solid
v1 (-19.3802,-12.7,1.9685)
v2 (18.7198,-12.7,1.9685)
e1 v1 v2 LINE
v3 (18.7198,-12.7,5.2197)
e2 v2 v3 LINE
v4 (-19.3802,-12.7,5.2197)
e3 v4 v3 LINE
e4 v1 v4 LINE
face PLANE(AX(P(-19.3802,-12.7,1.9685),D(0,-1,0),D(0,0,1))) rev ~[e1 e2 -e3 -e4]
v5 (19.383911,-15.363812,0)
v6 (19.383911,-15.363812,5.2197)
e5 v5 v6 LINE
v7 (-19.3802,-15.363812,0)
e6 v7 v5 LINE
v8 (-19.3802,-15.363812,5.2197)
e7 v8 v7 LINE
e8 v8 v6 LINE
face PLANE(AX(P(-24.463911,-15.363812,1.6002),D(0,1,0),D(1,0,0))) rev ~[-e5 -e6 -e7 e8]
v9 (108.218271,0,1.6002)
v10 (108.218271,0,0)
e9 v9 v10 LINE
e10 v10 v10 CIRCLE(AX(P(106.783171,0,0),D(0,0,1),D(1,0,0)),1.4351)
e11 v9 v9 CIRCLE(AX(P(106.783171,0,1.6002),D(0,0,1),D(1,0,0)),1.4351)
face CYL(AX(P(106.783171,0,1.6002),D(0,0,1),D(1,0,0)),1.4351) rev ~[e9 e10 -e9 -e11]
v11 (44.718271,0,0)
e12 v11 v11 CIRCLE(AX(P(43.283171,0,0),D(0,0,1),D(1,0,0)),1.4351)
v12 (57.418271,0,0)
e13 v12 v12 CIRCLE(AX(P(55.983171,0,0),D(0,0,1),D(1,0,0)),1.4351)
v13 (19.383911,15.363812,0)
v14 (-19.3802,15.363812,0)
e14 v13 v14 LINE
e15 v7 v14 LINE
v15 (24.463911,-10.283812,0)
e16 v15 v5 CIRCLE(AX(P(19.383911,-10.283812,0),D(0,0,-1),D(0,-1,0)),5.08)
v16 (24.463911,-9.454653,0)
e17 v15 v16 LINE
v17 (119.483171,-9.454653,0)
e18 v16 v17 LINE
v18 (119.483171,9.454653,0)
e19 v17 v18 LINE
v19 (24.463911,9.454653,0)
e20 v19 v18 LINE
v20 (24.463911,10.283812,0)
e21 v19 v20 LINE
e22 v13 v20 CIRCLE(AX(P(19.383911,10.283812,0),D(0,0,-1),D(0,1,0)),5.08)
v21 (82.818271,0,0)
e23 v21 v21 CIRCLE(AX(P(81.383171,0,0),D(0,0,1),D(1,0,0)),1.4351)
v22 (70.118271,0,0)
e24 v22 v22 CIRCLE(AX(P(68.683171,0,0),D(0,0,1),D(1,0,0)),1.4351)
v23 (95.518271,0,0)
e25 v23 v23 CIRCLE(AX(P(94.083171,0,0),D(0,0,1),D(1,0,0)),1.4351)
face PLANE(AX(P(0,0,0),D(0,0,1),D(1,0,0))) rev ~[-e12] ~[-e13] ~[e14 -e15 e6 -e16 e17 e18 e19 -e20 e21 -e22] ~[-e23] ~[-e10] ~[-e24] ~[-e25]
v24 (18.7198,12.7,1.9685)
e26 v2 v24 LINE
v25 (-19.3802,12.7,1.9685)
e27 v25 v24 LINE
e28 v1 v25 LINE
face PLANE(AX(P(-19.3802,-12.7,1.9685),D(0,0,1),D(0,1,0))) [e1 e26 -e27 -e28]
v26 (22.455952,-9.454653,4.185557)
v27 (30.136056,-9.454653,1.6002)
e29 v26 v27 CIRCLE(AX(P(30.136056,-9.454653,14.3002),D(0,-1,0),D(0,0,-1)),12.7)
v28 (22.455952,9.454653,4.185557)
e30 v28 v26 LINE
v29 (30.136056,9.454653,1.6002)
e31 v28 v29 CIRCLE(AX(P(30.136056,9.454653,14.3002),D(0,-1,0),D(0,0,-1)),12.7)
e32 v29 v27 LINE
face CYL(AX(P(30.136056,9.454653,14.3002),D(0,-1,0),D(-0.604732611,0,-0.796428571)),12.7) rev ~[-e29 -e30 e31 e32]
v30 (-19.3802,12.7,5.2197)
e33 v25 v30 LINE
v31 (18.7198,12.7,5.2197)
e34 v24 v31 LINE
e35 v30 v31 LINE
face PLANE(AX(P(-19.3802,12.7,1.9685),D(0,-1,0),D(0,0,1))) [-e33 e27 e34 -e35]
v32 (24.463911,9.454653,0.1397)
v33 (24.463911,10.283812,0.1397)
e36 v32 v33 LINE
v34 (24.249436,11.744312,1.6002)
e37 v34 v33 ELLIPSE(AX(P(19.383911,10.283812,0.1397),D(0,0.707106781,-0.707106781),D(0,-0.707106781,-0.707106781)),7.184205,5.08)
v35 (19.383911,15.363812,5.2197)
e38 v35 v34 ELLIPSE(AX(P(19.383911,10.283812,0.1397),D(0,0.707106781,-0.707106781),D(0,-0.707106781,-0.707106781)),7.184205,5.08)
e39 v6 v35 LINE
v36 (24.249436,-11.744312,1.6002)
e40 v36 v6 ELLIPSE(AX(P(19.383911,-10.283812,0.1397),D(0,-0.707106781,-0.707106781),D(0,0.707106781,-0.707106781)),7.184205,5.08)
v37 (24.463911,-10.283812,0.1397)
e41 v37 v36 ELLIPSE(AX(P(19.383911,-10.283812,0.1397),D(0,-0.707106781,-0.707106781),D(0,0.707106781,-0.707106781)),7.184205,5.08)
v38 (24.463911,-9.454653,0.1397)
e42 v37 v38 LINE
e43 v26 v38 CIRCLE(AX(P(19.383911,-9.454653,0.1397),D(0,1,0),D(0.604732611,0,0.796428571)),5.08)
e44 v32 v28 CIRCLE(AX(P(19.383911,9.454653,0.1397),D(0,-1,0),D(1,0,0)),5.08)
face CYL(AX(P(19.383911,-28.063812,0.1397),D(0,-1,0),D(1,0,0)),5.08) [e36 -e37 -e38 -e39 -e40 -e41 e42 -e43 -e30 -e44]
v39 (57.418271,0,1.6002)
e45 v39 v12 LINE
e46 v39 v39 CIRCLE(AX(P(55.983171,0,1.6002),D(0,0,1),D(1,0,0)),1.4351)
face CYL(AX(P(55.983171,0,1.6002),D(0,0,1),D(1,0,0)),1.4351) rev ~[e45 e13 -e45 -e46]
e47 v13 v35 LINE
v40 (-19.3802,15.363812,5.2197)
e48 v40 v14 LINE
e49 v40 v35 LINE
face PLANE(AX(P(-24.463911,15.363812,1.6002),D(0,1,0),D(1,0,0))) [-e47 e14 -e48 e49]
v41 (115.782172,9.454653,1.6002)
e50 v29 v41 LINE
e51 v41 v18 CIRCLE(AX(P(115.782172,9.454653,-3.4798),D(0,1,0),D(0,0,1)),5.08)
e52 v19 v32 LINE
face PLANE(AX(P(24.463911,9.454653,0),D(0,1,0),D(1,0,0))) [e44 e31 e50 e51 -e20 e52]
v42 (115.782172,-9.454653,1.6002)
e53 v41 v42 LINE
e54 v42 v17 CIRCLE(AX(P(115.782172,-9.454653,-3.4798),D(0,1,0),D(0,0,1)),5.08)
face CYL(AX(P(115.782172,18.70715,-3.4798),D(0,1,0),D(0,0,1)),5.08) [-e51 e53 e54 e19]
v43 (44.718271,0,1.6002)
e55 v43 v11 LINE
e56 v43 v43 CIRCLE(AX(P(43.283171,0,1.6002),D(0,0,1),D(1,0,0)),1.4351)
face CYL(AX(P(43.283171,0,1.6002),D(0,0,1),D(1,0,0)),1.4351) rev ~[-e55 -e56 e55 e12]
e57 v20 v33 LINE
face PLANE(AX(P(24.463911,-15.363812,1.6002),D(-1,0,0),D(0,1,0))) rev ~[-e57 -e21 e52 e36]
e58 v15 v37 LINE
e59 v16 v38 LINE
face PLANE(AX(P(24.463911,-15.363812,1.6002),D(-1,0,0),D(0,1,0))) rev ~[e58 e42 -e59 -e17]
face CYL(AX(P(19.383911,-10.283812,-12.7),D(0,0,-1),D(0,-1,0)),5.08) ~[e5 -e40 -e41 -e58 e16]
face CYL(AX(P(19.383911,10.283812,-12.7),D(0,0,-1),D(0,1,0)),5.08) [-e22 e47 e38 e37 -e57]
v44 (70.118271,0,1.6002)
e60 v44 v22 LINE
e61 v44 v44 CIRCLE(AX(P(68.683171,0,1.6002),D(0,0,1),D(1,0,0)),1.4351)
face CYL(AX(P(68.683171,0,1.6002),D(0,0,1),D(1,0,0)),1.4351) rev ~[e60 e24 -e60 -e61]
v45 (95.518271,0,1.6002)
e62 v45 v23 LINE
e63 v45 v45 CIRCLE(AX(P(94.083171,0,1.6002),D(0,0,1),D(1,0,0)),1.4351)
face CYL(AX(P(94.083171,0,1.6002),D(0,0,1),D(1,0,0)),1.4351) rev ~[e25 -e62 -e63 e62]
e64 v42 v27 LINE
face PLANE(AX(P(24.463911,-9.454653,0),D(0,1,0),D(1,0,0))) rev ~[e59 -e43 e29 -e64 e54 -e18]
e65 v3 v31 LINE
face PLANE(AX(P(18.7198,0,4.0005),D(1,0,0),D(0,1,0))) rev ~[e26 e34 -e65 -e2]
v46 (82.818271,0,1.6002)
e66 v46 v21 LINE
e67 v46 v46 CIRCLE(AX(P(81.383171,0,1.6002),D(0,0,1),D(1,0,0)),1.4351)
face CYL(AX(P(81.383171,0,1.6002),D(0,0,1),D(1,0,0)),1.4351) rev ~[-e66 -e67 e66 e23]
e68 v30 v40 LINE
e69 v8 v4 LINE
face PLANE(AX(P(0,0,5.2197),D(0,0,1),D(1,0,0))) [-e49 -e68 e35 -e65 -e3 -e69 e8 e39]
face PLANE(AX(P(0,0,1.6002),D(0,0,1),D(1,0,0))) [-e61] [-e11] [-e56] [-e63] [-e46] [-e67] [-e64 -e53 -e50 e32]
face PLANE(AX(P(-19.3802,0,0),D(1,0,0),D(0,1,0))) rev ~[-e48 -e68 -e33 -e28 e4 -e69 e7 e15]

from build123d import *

# Parameters (mm, degrees)
F0_W         = 95.0192604214
F0_H         = 18.9093053341
F1_DEPTH     = 1.6002
F2_R         = 1.4351
F3_DEPTH     = 25.4
F4_R         = 1.397
F5_DEPTH     = 2.54
F6_W         = 48.927821219
F6_H         = 30.7276230305
F7_DEPTH     = 3.6195
F8_T1_DEPTH  = 30.6197
F8_T6_DEPTH  = 56.1276230305
F8_T12_DEPTH = 56.1276230305
F8_T18_DEPTH = 56.1276230305
F8_T25_DEPTH = 56.1276230305
F8_T31_DEPTH = 56.1276230305
F8_T37_DEPTH = 56.1276230305
F8_T43_DEPTH = 56.1276230305
F8_T49_DEPTH = 56.1276230305
F8_T56_DEPTH = 56.1276230305
F8_T62_DEPTH = 56.1276230305
F9_T1_DEPTH  = 37.4142992276
F10_R        = 12.7
F12_R        = 33.1286185238
F13_DEPTH    = 102.87
F14_W        = 25.4
F14_H        = 4.064
F15_DEPTH    = 38.1


# Not quite as in the source:
# - a fillet or chamfer that OpenCascade refuses, or shapes differently, is made with other operations: its cross-section is extruded or revolved along the edge and cut away or added


with BuildPart() as f1:
    # F0 (on Top) → F1 (new body)
    with BuildSketch(Plane.XY):
        Polygon((-24.4639106095, -15.3638115153), (24.4639106095, -15.3638115153), (24.4639106095, -9.454652667), (24.4639106095, 9.454652667), (24.4639106095, 15.3638115153), (-24.4639106095, 15.3638115153), (-24.4639106095, 9.454652667), (-24.4639106095, -9.454652667), align=None)
        with Locations((71.9735408202, 0)):
            Rectangle(F0_W, F0_H)
        with Locations((-71.9735408202, 0)):
            Rectangle(F0_W, F0_H)
    extrude(amount=F1_DEPTH)

    # F2 (on face) → F3 (cut)
    with BuildSketch(Plane.XY.offset(1.6002)):
        with Locations((106.7831710309, 0)):
            Circle(F2_R)
        with Locations((94.0831710309, 0)):
            Circle(F2_R)
        with Locations((81.3831710309, 0)):
            Circle(F2_R)
        with Locations((68.6831710309, 0)):
            Circle(F2_R)
        with Locations((55.9831710309, 0)):
            Circle(F2_R)
        with Locations((43.2831710309, 0)):
            Circle(F2_R)
    extrude(amount=-F3_DEPTH, mode=Mode.SUBTRACT)

    # F4 (on face) → F5 (join)
    with BuildSketch(Plane.XY.offset(1.6002)):
        with Locations((-106.7719441229, 0)):
            Circle(F4_R)
        with Locations((-94.0719441229, 0)):
            Circle(F4_R)
        with Locations((-81.3719441229, 0)):
            Circle(F4_R)
        with Locations((-68.6719441229, 0)):
            Circle(F4_R)
        with Locations((-55.9719441229, 0)):
            Circle(F4_R)
        with Locations((-43.2719441229, 0)):
            Circle(F4_R)
    extrude(amount=F5_DEPTH)

    # F6 (on face) → F7 (join)
    with BuildSketch(Plane.XY.offset(1.6002)):
        Rectangle(F6_W, F6_H)
    extrude(amount=F7_DEPTH)

    # F8: fillet of radius 5.08 on 6 edges, made by hand

    # F8_s2 → F8_t1 (cut)
    with BuildSketch(Plane.XY.offset(-12.7)):
        with BuildLine():
            ThreePointArc((-19.3839106095, 15.3638115153), (-22.9760130579, 13.8759139637), (-24.4639106095, 10.2838115153))
            Line((-24.4639106095, 10.2838115153), (-24.4639106095, 15.3638115153))
            Line((-24.4639106095, 15.3638115153), (-19.3839106095, 15.3638115153))
        make_face()
        with BuildLine():
            ThreePointArc((-19.3839106095, -15.3638115153), (-22.9760130579, -13.8759139637), (-24.4639106095, -10.2838115153))
            Line((-24.4639106095, -10.2838115153), (-24.4639106095, -15.3638115153))
            Line((-24.4639106095, -15.3638115153), (-19.3839106095, -15.3638115153))
        make_face()
        with BuildLine():
            ThreePointArc((19.3839106095, -15.3638115153), (22.9760130579, -13.8759139637), (24.4639106095, -10.2838115153))
            Line((24.4639106095, -10.2838115153), (24.4639106095, -15.3638115153))
            Line((24.4639106095, -15.3638115153), (19.3839106095, -15.3638115153))
        make_face()
        with BuildLine():
            ThreePointArc((19.3839106095, 15.3638115153), (22.9760130579, 13.8759139637), (24.4639106095, 10.2838115153))
            Line((24.4639106095, 10.2838115153), (24.4639106095, 15.3638115153))
            Line((24.4639106095, 15.3638115153), (19.3839106095, 15.3638115153))
        make_face()
    extrude(amount=F8_T1_DEPTH, mode=Mode.SUBTRACT)


with BuildPart() as f8_tool4:
    # F8_s5 → F8_t6 (new body)
    with BuildSketch(Plane.XZ.offset(28.0638115153)):
        with BuildLine():
            ThreePointArc((24.4639106095, 0.1397), (22.9760130579, 3.7318024484), (19.3839106095, 5.2197))
            Line((19.3839106095, 5.2197), (24.4639106095, 5.2197))
            Line((24.4639106095, 5.2197), (24.4639106095, 0.1397))
        make_face()
    extrude(amount=-F8_T6_DEPTH)

    split(bisect_by=Plane.XY.offset(1.6002), keep=Keep.BOTTOM)

    split(bisect_by=Plane.XZ.offset(9.454652667), keep=Keep.TOP)


with BuildPart() as f1_1:
    add(f1.part)

    # F8_t3: cut F8_tool4
    add(f8_tool4.part, mode=Mode.SUBTRACT)


with BuildPart() as f8_tool10:
    # F8_s11 → F8_t12 (new body)
    with BuildSketch(Plane.XZ.offset(28.0638115153)):
        with BuildLine():
            ThreePointArc((24.4639106095, 0.1397), (22.9760130579, 3.7318024484), (19.3839106095, 5.2197))
            Line((19.3839106095, 5.2197), (24.4639106095, 5.2197))
            Line((24.4639106095, 5.2197), (24.4639106095, 0.1397))
        make_face()
    extrude(amount=-F8_T12_DEPTH)

    split(bisect_by=Plane.XY.offset(1.6002), keep=Keep.TOP)

    split(bisect_by=Plane.XZ.offset(9.454652667), keep=Keep.TOP)


with BuildPart() as f1_2:
    add(f1_1.part)

    # F8_t9: cut F8_tool10
    add(f8_tool10.part, mode=Mode.SUBTRACT)


with BuildPart() as f8_tool16:
    # F8_s17 → F8_t18 (new body)
    with BuildSketch(Plane.XZ.offset(28.0638115153)):
        with BuildLine():
            ThreePointArc((24.4639106095, 0.1397), (22.9760130579, 3.7318024484), (19.3839106095, 5.2197))
            Line((19.3839106095, 5.2197), (24.4639106095, 5.2197))
            Line((24.4639106095, 5.2197), (24.4639106095, 0.1397))
        make_face()
    extrude(amount=-F8_T18_DEPTH)

    split(bisect_by=Plane.XY.offset(1.6002), keep=Keep.TOP)

    split(bisect_by=Plane.XZ.offset(-9.454652667), keep=Keep.TOP)

    split(bisect_by=Plane.XZ.offset(9.454652667), keep=Keep.BOTTOM)


with BuildPart() as f1_3:
    add(f1_2.part)

    # F8_t15: cut F8_tool16
    add(f8_tool16.part, mode=Mode.SUBTRACT)


with BuildPart() as f8_tool23:
    # F8_s24 → F8_t25 (new body)
    with BuildSketch(Plane.XZ.offset(28.0638115153)):
        with BuildLine():
            ThreePointArc((24.4639106095, 0.1397), (22.9760130579, 3.7318024484), (19.3839106095, 5.2197))
            Line((19.3839106095, 5.2197), (24.4639106095, 5.2197))
            Line((24.4639106095, 5.2197), (24.4639106095, 0.1397))
        make_face()
    extrude(amount=-F8_T25_DEPTH)

    split(bisect_by=Plane.XY.offset(1.6002), keep=Keep.BOTTOM)

    split(bisect_by=Plane.XZ.offset(-9.454652667), keep=Keep.BOTTOM)


with BuildPart() as f1_4:
    add(f1_3.part)

    # F8_t22: cut F8_tool23
    add(f8_tool23.part, mode=Mode.SUBTRACT)


with BuildPart() as f8_tool29:
    # F8_s30 → F8_t31 (new body)
    with BuildSketch(Plane.XZ.offset(28.0638115153)):
        with BuildLine():
            ThreePointArc((24.4639106095, 0.1397), (22.9760130579, 3.7318024484), (19.3839106095, 5.2197))
            Line((19.3839106095, 5.2197), (24.4639106095, 5.2197))
            Line((24.4639106095, 5.2197), (24.4639106095, 0.1397))
        make_face()
    extrude(amount=-F8_T31_DEPTH)

    split(bisect_by=Plane.XY.offset(1.6002), keep=Keep.TOP)

    split(bisect_by=Plane.XZ.offset(-9.454652667), keep=Keep.BOTTOM)


with BuildPart() as f1_5:
    add(f1_4.part)

    # F8_t28: cut F8_tool29
    add(f8_tool29.part, mode=Mode.SUBTRACT)


with BuildPart() as f8_tool35:
    # F8_s36 → F8_t37 (new body)
    with BuildSketch(Plane.XZ.offset(-28.0638115153)):
        with BuildLine():
            ThreePointArc((-19.3839106095, 5.2197), (-22.9760130579, 3.7318024484), (-24.4639106095, 0.1397))
            Line((-24.4639106095, 0.1397), (-24.4639106095, 5.2197))
            Line((-24.4639106095, 5.2197), (-19.3839106095, 5.2197))
        make_face()
    extrude(amount=F8_T37_DEPTH)

    split(bisect_by=Plane.XZ.offset(-9.454652667), keep=Keep.BOTTOM)

    split(bisect_by=Plane.XY.offset(1.6002), keep=Keep.TOP)


with BuildPart() as f1_6:
    add(f1_5.part)

    # F8_t34: cut F8_tool35
    add(f8_tool35.part, mode=Mode.SUBTRACT)


with BuildPart() as f8_tool41:
    # F8_s42 → F8_t43 (new body)
    with BuildSketch(Plane.XZ.offset(-28.0638115153)):
        with BuildLine():
            ThreePointArc((-19.3839106095, 5.2197), (-22.9760130579, 3.7318024484), (-24.4639106095, 0.1397))
            Line((-24.4639106095, 0.1397), (-24.4639106095, 5.2197))
            Line((-24.4639106095, 5.2197), (-19.3839106095, 5.2197))
        make_face()
    extrude(amount=F8_T43_DEPTH)

    split(bisect_by=Plane.XZ.offset(-9.454652667), keep=Keep.BOTTOM)

    split(bisect_by=Plane.XY.offset(1.6002), keep=Keep.BOTTOM)


with BuildPart() as f1_7:
    add(f1_6.part)

    # F8_t40: cut F8_tool41
    add(f8_tool41.part, mode=Mode.SUBTRACT)


with BuildPart() as f8_tool47:
    # F8_s48 → F8_t49 (new body)
    with BuildSketch(Plane.XZ.offset(-28.0638115153)):
        with BuildLine():
            ThreePointArc((-19.3839106095, 5.2197), (-22.9760130579, 3.7318024484), (-24.4639106095, 0.1397))
            Line((-24.4639106095, 0.1397), (-24.4639106095, 5.2197))
            Line((-24.4639106095, 5.2197), (-19.3839106095, 5.2197))
        make_face()
    extrude(amount=F8_T49_DEPTH)

    split(bisect_by=Plane.XZ.offset(-9.454652667), keep=Keep.TOP)

    split(bisect_by=Plane.XY.offset(1.6002), keep=Keep.TOP)

    split(bisect_by=Plane.XZ.offset(9.454652667), keep=Keep.BOTTOM)


with BuildPart() as f1_8:
    add(f1_7.part)

    # F8_t46: cut F8_tool47
    add(f8_tool47.part, mode=Mode.SUBTRACT)


with BuildPart() as f8_tool54:
    # F8_s55 → F8_t56 (new body)
    with BuildSketch(Plane.XZ.offset(-28.0638115153)):
        with BuildLine():
            ThreePointArc((-19.3839106095, 5.2197), (-22.9760130579, 3.7318024484), (-24.4639106095, 0.1397))
            Line((-24.4639106095, 0.1397), (-24.4639106095, 5.2197))
            Line((-24.4639106095, 5.2197), (-19.3839106095, 5.2197))
        make_face()
    extrude(amount=F8_T56_DEPTH)

    split(bisect_by=Plane.XY.offset(1.6002), keep=Keep.TOP)

    split(bisect_by=Plane.XZ.offset(9.454652667), keep=Keep.TOP)


with BuildPart() as f1_9:
    add(f1_8.part)

    # F8_t53: cut F8_tool54
    add(f8_tool54.part, mode=Mode.SUBTRACT)


with BuildPart() as f8_tool60:
    # F8_s61 → F8_t62 (new body)
    with BuildSketch(Plane.XZ.offset(-28.0638115153)):
        with BuildLine():
            ThreePointArc((-19.3839106095, 5.2197), (-22.9760130579, 3.7318024484), (-24.4639106095, 0.1397))
            Line((-24.4639106095, 0.1397), (-24.4639106095, 5.2197))
            Line((-24.4639106095, 5.2197), (-19.3839106095, 5.2197))
        make_face()
    extrude(amount=F8_T62_DEPTH)

    split(bisect_by=Plane.XY.offset(1.6002), keep=Keep.BOTTOM)

    split(bisect_by=Plane.XZ.offset(9.454652667), keep=Keep.TOP)


with BuildPart() as f1_10:
    add(f1_9.part)

    # F8_t59: cut F8_tool60
    add(f8_tool60.part, mode=Mode.SUBTRACT)

    # F9: fillet of radius 5.08 on 2 edges, made by hand

    # F9_s2 → F9_t1 (cut)
    with BuildSketch(Plane.XZ.offset(-18.7071496138)):
        with BuildLine():
            ThreePointArc((115.7821722522, 1.6002), (117.7982347512, 1.1830201767), (119.4831710309, 0))
            Line((119.4831710309, 0), (119.4831710309, 1.6002))
            Line((119.4831710309, 1.6002), (115.7821722522, 1.6002))
        make_face()
        with BuildLine():
            ThreePointArc((-119.4831710309, 0), (-117.7982347512, 1.1830201767), (-115.7821722522, 1.6002))
            Line((-115.7821722522, 1.6002), (-119.4831710309, 1.6002))
            Line((-119.4831710309, 1.6002), (-119.4831710309, 0))
        make_face()
    extrude(amount=F9_T1_DEPTH, mode=Mode.SUBTRACT)

    # F10
    f10_edges = [f1_10.edges().sort_by_distance(p)[0] for p in [
        (24.249436, 0, 1.6002),
        (-24.249436, 0, 1.6002),
    ]]
    fillet(f10_edges, radius=F10_R)

    # F12 (on offset) → F13 (cut)
    with BuildSketch(Plane.YZ.offset(-19.3802)):
        Circle(F12_R)
    extrude(amount=-F13_DEPTH, mode=Mode.SUBTRACT)

    # F14 (on offset) → F15 (cut)
    with BuildSketch(Plane.YZ.offset(-19.3802)):
        with Locations((0, 4.0005)):
            Rectangle(F14_W, F14_H)
    extrude(amount=F15_DEPTH, mode=Mode.SUBTRACT)


solid = f1_10.part
